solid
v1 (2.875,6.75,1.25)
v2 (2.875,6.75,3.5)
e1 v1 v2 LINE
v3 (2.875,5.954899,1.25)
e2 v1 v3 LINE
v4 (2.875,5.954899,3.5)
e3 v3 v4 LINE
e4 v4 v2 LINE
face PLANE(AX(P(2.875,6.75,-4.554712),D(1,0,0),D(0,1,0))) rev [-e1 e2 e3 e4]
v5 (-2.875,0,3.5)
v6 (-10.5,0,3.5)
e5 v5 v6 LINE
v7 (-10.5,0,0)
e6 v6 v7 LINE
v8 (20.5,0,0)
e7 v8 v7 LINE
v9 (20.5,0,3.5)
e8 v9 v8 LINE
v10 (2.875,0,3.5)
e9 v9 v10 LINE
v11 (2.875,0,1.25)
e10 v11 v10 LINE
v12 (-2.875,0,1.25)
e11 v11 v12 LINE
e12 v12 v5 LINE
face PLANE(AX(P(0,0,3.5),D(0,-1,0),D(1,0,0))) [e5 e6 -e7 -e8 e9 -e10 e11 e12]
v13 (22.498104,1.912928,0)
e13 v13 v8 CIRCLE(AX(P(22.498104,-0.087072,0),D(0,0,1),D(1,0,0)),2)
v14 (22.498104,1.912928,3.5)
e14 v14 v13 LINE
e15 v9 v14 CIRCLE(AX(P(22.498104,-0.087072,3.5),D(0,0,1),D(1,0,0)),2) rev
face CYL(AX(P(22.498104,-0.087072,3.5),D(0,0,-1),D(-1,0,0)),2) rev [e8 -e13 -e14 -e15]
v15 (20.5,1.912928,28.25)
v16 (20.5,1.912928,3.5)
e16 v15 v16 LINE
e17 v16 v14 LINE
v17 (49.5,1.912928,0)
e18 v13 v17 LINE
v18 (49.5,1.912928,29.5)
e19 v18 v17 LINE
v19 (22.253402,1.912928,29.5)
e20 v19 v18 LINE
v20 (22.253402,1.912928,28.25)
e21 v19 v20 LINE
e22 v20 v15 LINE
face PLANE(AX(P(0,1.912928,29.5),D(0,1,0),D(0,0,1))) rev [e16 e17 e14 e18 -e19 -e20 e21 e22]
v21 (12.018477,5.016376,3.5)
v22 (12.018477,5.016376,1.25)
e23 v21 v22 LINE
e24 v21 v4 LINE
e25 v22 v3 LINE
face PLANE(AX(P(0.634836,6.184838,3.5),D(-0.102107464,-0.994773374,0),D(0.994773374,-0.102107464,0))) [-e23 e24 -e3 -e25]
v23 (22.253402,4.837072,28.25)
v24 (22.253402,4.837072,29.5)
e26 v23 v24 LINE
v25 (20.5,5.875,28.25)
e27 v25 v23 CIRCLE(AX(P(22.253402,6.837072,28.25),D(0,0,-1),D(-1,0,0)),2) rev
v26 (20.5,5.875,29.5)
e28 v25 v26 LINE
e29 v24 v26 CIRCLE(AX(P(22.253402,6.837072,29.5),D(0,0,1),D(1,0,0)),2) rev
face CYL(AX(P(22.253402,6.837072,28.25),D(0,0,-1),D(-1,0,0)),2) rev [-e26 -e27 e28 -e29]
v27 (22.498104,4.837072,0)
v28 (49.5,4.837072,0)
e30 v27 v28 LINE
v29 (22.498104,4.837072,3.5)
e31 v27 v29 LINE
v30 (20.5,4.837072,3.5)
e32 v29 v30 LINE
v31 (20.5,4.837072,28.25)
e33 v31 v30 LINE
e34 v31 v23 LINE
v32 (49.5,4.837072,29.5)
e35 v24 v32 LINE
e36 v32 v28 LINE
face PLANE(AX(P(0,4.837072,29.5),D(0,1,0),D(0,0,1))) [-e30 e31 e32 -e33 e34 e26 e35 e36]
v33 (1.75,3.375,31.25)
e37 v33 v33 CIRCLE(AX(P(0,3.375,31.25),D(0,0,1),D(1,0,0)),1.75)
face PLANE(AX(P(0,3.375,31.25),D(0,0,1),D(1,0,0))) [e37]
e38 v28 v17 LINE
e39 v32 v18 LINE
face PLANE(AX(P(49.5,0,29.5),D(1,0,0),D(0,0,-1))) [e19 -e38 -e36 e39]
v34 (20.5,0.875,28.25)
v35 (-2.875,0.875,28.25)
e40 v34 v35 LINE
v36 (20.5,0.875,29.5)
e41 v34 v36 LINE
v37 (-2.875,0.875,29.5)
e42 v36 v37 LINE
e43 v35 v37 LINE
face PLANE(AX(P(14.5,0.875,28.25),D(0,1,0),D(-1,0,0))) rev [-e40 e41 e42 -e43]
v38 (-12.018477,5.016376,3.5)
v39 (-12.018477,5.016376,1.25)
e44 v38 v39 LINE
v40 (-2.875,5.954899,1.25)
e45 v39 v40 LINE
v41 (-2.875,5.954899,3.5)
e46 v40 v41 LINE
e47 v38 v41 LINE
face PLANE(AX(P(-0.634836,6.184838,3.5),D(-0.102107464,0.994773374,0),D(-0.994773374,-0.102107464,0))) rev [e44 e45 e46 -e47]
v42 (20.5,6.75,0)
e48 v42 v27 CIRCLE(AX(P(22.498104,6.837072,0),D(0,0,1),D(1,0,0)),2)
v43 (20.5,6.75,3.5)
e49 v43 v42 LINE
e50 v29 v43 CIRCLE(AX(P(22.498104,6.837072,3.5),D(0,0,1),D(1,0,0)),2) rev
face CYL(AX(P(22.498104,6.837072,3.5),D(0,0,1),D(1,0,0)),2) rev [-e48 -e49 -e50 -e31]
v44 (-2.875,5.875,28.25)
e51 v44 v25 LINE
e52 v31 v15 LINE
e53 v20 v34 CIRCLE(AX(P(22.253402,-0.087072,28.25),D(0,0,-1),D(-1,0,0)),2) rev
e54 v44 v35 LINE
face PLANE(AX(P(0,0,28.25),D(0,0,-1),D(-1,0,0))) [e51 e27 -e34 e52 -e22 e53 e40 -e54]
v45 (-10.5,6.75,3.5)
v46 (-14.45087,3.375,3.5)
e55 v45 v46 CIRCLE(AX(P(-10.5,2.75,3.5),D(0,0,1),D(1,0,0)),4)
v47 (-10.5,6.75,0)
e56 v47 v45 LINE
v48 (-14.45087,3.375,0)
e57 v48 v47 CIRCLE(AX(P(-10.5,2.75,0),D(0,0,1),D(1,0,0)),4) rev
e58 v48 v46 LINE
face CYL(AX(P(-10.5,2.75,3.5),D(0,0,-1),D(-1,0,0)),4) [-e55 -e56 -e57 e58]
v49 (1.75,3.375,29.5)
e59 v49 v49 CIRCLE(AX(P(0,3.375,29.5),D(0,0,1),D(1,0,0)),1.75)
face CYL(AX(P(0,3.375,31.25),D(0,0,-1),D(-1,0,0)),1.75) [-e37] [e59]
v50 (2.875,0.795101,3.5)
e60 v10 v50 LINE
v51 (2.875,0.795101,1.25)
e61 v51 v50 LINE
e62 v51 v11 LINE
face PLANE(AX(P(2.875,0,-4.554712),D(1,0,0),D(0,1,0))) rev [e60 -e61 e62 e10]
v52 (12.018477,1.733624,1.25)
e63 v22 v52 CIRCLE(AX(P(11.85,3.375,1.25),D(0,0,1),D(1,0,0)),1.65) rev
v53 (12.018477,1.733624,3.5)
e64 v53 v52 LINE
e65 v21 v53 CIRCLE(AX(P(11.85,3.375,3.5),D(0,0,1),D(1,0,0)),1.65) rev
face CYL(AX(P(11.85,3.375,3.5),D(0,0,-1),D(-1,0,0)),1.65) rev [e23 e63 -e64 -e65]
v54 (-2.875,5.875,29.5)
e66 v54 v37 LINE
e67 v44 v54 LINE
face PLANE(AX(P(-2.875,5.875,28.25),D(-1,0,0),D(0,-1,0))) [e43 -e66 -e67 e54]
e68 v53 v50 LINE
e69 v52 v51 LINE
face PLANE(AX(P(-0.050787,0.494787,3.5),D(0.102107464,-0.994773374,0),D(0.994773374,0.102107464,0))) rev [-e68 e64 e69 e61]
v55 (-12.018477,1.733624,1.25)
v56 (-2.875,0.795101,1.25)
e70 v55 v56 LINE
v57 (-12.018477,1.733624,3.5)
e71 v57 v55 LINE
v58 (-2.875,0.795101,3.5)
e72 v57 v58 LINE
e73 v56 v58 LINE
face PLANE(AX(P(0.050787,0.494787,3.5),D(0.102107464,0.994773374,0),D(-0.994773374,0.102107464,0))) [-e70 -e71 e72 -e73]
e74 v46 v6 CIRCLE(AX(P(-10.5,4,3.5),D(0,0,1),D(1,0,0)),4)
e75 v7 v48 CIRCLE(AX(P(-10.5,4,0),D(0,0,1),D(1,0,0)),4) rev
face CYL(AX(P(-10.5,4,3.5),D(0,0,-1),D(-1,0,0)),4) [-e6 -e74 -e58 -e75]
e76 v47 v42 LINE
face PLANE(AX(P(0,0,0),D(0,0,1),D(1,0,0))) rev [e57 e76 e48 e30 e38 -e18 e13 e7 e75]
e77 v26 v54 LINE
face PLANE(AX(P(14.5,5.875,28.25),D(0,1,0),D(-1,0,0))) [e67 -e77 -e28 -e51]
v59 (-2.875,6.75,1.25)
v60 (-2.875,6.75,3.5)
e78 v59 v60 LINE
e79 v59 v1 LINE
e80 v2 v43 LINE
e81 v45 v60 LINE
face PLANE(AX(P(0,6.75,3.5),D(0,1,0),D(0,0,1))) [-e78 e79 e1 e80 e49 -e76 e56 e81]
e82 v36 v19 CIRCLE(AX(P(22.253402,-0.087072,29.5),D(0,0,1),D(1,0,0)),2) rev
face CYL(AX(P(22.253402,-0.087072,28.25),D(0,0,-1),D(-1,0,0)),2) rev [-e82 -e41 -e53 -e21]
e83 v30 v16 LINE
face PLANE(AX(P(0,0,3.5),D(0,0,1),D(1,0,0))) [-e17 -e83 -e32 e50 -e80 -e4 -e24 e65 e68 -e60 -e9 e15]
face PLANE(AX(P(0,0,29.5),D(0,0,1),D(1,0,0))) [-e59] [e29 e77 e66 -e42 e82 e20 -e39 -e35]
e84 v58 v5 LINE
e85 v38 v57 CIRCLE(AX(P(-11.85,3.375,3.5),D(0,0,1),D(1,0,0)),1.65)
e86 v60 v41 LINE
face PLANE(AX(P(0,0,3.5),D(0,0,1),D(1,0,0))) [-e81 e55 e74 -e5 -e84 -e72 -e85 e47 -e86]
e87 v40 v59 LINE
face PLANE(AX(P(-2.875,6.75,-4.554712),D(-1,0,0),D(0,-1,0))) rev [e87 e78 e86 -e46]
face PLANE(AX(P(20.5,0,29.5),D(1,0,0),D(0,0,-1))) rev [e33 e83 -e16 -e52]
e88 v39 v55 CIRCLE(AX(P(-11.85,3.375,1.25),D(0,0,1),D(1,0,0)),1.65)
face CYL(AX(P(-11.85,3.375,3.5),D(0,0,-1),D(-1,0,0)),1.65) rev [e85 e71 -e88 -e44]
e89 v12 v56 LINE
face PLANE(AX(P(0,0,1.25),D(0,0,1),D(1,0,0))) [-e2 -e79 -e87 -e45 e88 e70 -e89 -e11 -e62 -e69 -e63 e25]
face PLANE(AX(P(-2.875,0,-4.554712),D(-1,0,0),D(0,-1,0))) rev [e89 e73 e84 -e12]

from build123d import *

# Parameters (mm, degrees)
SKETCH1_W            = 35
SKETCH1_H            = 6.75
BOSS_EXTRUDE10_DEPTH = 3.5
SKETCH1_16_R         = 0.291434634
BOSS_EXTRUDE15_DEPTH = 1.25
SKETCH1_17_W         = 29
SKETCH1_17_H         = 2.924143722
BOSS_EXTRUDE17_DEPTH = 29.5
BOSS_EXTRUDE18_DEPTH = 1.25
SKETCH2_9_R          = 1.75
BOSS_EXTRUDE19_DEPTH = 1.75
FILLET1_R            = 2
FILLET2_R            = 4
SKETCH3_W            = 5.75
SKETCH3_H            = 0.795101344
CUT_EXTRUDE1_DEPTH   = 2.25


with BuildPart() as part:
    # Sketch1 → Boss-Extrude10 (new body)
    with BuildSketch(Plane.XY):
        with Locations((3, 3.375)):
            Rectangle(SKETCH1_W, SKETCH1_H)
        with BuildLine():
            Line((0, 6.25), (12.018477316, 5.016376067))
            ThreePointArc((12.018477316, 5.016376067), (13.5, 3.375), (12.018477316, 1.733623933))
            Line((12.018477316, 1.733623933), (0, 0.5))
            Line((0, 0.5), (-12.018477316, 1.733623933))
            ThreePointArc((-12.018477316, 1.733623933), (-13.5, 3.375), (-12.018477316, 5.016376067))
            Line((-12.018477316, 5.016376067), (0, 6.25))
        make_face(mode=Mode.SUBTRACT)
    extrude(amount=BOSS_EXTRUDE10_DEPTH)

    # Sketch1<16> → Boss-Extrude15 (add)
    # profile 1 of 9: a face of its own
    with BuildSketch(Plane.XY):
        with BuildLine():
            Line((-0.584049273, 6.190050878), (-12.018477316, 5.016376067))
            ThreePointArc((-12.018477316, 5.016376067), (-13.5, 3.375), (-12.018477316, 1.733623933))
            Line((-12.018477316, 1.733623933), (-0.584049273, 0.559949122))
            ThreePointArc((-0.584049273, 0.559949122), (-2.875, 3.375), (-0.584049273, 6.190050878))
        make_face()
        with Locations((-11.85, 3.375)):
            Circle(SKETCH1_16_R, mode=Mode.SUBTRACT)
        with Locations((-9.813185408, 3.375)):
            Circle(SKETCH1_16_R, mode=Mode.SUBTRACT)
        with Locations((-7.776370816, 3.375)):
            Circle(SKETCH1_16_R, mode=Mode.SUBTRACT)
    # profile 2 of 9: a face of its own
    with BuildSketch(Plane.XY):
        with Locations((-11.85, 3.375)):
            Circle(SKETCH1_16_R)
    # profile 3 of 9: a face of its own
    with BuildSketch(Plane.XY):
        with Locations((-7.776370816, 3.375)):
            Circle(SKETCH1_16_R)
    # profile 4 of 9: a face of its own
    with BuildSketch(Plane.XY):
        with Locations((-9.813185408, 3.375)):
            Circle(SKETCH1_16_R)
    # profile 5 of 9: a face of its own
    with BuildSketch(Plane.XY):
        with BuildLine():
            Line((0, 6.25), (-0.584049273, 6.190050878))
            ThreePointArc((-0.584049273, 6.190050878), (-2.875, 3.375), (-0.584049273, 0.559949122))
            Line((-0.584049273, 0.559949122), (0, 0.5))
            Line((0, 0.5), (0.584049273, 0.559949122))
            ThreePointArc((0.584049273, 0.559949122), (2.229884152, 1.56027091), (2.875, 3.375))
            ThreePointArc((2.875, 3.375), (2.229884152, 5.18972909), (0.584049273, 6.190050878))
            Line((0.584049273, 6.190050878), (0, 6.25))
        make_face()
    # profile 6 of 9: a face of its own
    with BuildSketch(Plane.XY):
        with BuildLine():
            Line((12.018477316, 5.016376067), (0.584049273, 6.190050878))
            ThreePointArc((0.584049273, 6.190050878), (2.229884152, 5.18972909), (2.875, 3.375))
            ThreePointArc((2.875, 3.375), (2.229884152, 1.56027091), (0.584049273, 0.559949122))
            Line((0.584049273, 0.559949122), (12.018477316, 1.733623933))
            ThreePointArc((12.018477316, 1.733623933), (13.5, 3.375), (12.018477316, 5.016376067))
        make_face()
        with Locations((7.776370816, 3.375)):
            Circle(SKETCH1_16_R, mode=Mode.SUBTRACT)
        with Locations((9.813185408, 3.375)):
            Circle(SKETCH1_16_R, mode=Mode.SUBTRACT)
        with Locations((11.85, 3.375)):
            Circle(SKETCH1_16_R, mode=Mode.SUBTRACT)
    # profile 7 of 9: a face of its own
    with BuildSketch(Plane.XY):
        with Locations((11.85, 3.375)):
            Circle(SKETCH1_16_R)
    # profile 8 of 9: a face of its own
    with BuildSketch(Plane.XY):
        with Locations((9.813185408, 3.375)):
            Circle(SKETCH1_16_R)
    # profile 9 of 9: a face of its own
    with BuildSketch(Plane.XY):
        with Locations((7.776370816, 3.375)):
            Circle(SKETCH1_16_R)
    extrude(amount=BOSS_EXTRUDE15_DEPTH)

    # Sketch1<17> → Boss-Extrude17 (add)
    with BuildSketch(Plane.XY):
        with Locations((35, 3.375)):
            Rectangle(SKETCH1_17_W, SKETCH1_17_H)
    extrude(amount=BOSS_EXTRUDE17_DEPTH)

    # Sketch2 → Boss-Extrude18 (add)
    with BuildSketch(Plane.XY.offset(29.5)):
        Polygon((14.5, 5.875), (-2.875, 5.875), (-2.875, 0.875), (14.5, 0.875), (20.5, 0.875), (20.5, 5.875), align=None)
    extrude(amount=-BOSS_EXTRUDE18_DEPTH)

    # Sketch2<9> → Boss-Extrude19 (add)
    with BuildSketch(Plane.XY.offset(29.5)):
        with Locations((0, 3.375)):
            Circle(SKETCH2_9_R)
    extrude(amount=BOSS_EXTRUDE19_DEPTH)

    # Fillet1
    # the kernel refuses this fillet: 2 mm, written as the material it adds along each edge
    with BuildSketch(Plane(origin=(20.5, 1.912928139, 0), x_dir=(0, -1, 0), z_dir=(0, 0, 1))) as fillet1_piece_1:
        with BuildLine():
            CenterArc((2, 1.998103724), FILLET1_R, 180, 87.504786267)
            Line((0, 1.998103724), (0, 0))
            Line((0, 0), (1.912928139, 0))
        make_face()
    extrude(amount=3.5)
    with BuildSketch(Plane(origin=(20.5, 4.837071861, 0), x_dir=(0, 1, 0), z_dir=(0, 0, 1))) as fillet1_piece_2:
        with BuildLine():
            CenterArc((2, -1.998103724), FILLET1_R, 92.495213733, 87.504786267)
            Line((0, -1.998103724), (0, 0))
            Line((0, 0), (1.912928139, 0))
        make_face()
    extrude(amount=3.5)
    with BuildSketch(Plane(origin=(20.5, 1.912928139, 28.25), x_dir=(1, 0, 0), z_dir=(0, 0, 1))) as fillet1_piece_3:
        with BuildLine():
            CenterArc((1.753401761, -2), FILLET1_R, 90, 61.246917848)
            Line((0, -1.037928139), (0, 0))
            Line((0, 0), (1.753401761, 0))
        make_face()
    extrude(amount=1.25)
    with BuildSketch(Plane(origin=(20.5, 4.837071861, 28.25), x_dir=(1, 0, 0), z_dir=(0, 0, 1))) as fillet1_piece_4:
        with BuildLine():
            CenterArc((1.753401761, 2), FILLET1_R, 208.753082152, 61.246917848)
            Line((0, 1.037928139), (0, 0))
            Line((0, 0), (1.753401761, 0))
        make_face()
    extrude(amount=1.25)

    # Fillet2
    # the kernel refuses this fillet: 4 mm, written as the material it takes off along each edge
    with BuildSketch(Plane(origin=(-14.5, 6.75, -10), x_dir=(0, -1, 0), z_dir=(0, 0, 1)), Plane(origin=(-14.5, 0, -10), x_dir=(1, 0, 0), z_dir=(0, 0, 1))) as fillet2_piece_1:
        with BuildLine():
            CenterArc((FILLET2_R, FILLET2_R), FILLET2_R, 180, 90)
            Line((0, FILLET2_R), (0, 0))
            Line((0, 0), (FILLET2_R, 0))
        make_face()
    extrude(amount=23.5, mode=Mode.SUBTRACT)

    # Sketch3 → Cut-Extrude1 (cut)
    with BuildSketch(Plane.XY.offset(3.5)):
        with Locations((0, 0.397550672)):
            Rectangle(SKETCH3_W, SKETCH3_H)
        with Locations((0, 6.352449328)):
            Rectangle(SKETCH3_W, SKETCH3_H)
    extrude(amount=-CUT_EXTRUDE1_DEPTH, mode=Mode.SUBTRACT)


solid = part.part
